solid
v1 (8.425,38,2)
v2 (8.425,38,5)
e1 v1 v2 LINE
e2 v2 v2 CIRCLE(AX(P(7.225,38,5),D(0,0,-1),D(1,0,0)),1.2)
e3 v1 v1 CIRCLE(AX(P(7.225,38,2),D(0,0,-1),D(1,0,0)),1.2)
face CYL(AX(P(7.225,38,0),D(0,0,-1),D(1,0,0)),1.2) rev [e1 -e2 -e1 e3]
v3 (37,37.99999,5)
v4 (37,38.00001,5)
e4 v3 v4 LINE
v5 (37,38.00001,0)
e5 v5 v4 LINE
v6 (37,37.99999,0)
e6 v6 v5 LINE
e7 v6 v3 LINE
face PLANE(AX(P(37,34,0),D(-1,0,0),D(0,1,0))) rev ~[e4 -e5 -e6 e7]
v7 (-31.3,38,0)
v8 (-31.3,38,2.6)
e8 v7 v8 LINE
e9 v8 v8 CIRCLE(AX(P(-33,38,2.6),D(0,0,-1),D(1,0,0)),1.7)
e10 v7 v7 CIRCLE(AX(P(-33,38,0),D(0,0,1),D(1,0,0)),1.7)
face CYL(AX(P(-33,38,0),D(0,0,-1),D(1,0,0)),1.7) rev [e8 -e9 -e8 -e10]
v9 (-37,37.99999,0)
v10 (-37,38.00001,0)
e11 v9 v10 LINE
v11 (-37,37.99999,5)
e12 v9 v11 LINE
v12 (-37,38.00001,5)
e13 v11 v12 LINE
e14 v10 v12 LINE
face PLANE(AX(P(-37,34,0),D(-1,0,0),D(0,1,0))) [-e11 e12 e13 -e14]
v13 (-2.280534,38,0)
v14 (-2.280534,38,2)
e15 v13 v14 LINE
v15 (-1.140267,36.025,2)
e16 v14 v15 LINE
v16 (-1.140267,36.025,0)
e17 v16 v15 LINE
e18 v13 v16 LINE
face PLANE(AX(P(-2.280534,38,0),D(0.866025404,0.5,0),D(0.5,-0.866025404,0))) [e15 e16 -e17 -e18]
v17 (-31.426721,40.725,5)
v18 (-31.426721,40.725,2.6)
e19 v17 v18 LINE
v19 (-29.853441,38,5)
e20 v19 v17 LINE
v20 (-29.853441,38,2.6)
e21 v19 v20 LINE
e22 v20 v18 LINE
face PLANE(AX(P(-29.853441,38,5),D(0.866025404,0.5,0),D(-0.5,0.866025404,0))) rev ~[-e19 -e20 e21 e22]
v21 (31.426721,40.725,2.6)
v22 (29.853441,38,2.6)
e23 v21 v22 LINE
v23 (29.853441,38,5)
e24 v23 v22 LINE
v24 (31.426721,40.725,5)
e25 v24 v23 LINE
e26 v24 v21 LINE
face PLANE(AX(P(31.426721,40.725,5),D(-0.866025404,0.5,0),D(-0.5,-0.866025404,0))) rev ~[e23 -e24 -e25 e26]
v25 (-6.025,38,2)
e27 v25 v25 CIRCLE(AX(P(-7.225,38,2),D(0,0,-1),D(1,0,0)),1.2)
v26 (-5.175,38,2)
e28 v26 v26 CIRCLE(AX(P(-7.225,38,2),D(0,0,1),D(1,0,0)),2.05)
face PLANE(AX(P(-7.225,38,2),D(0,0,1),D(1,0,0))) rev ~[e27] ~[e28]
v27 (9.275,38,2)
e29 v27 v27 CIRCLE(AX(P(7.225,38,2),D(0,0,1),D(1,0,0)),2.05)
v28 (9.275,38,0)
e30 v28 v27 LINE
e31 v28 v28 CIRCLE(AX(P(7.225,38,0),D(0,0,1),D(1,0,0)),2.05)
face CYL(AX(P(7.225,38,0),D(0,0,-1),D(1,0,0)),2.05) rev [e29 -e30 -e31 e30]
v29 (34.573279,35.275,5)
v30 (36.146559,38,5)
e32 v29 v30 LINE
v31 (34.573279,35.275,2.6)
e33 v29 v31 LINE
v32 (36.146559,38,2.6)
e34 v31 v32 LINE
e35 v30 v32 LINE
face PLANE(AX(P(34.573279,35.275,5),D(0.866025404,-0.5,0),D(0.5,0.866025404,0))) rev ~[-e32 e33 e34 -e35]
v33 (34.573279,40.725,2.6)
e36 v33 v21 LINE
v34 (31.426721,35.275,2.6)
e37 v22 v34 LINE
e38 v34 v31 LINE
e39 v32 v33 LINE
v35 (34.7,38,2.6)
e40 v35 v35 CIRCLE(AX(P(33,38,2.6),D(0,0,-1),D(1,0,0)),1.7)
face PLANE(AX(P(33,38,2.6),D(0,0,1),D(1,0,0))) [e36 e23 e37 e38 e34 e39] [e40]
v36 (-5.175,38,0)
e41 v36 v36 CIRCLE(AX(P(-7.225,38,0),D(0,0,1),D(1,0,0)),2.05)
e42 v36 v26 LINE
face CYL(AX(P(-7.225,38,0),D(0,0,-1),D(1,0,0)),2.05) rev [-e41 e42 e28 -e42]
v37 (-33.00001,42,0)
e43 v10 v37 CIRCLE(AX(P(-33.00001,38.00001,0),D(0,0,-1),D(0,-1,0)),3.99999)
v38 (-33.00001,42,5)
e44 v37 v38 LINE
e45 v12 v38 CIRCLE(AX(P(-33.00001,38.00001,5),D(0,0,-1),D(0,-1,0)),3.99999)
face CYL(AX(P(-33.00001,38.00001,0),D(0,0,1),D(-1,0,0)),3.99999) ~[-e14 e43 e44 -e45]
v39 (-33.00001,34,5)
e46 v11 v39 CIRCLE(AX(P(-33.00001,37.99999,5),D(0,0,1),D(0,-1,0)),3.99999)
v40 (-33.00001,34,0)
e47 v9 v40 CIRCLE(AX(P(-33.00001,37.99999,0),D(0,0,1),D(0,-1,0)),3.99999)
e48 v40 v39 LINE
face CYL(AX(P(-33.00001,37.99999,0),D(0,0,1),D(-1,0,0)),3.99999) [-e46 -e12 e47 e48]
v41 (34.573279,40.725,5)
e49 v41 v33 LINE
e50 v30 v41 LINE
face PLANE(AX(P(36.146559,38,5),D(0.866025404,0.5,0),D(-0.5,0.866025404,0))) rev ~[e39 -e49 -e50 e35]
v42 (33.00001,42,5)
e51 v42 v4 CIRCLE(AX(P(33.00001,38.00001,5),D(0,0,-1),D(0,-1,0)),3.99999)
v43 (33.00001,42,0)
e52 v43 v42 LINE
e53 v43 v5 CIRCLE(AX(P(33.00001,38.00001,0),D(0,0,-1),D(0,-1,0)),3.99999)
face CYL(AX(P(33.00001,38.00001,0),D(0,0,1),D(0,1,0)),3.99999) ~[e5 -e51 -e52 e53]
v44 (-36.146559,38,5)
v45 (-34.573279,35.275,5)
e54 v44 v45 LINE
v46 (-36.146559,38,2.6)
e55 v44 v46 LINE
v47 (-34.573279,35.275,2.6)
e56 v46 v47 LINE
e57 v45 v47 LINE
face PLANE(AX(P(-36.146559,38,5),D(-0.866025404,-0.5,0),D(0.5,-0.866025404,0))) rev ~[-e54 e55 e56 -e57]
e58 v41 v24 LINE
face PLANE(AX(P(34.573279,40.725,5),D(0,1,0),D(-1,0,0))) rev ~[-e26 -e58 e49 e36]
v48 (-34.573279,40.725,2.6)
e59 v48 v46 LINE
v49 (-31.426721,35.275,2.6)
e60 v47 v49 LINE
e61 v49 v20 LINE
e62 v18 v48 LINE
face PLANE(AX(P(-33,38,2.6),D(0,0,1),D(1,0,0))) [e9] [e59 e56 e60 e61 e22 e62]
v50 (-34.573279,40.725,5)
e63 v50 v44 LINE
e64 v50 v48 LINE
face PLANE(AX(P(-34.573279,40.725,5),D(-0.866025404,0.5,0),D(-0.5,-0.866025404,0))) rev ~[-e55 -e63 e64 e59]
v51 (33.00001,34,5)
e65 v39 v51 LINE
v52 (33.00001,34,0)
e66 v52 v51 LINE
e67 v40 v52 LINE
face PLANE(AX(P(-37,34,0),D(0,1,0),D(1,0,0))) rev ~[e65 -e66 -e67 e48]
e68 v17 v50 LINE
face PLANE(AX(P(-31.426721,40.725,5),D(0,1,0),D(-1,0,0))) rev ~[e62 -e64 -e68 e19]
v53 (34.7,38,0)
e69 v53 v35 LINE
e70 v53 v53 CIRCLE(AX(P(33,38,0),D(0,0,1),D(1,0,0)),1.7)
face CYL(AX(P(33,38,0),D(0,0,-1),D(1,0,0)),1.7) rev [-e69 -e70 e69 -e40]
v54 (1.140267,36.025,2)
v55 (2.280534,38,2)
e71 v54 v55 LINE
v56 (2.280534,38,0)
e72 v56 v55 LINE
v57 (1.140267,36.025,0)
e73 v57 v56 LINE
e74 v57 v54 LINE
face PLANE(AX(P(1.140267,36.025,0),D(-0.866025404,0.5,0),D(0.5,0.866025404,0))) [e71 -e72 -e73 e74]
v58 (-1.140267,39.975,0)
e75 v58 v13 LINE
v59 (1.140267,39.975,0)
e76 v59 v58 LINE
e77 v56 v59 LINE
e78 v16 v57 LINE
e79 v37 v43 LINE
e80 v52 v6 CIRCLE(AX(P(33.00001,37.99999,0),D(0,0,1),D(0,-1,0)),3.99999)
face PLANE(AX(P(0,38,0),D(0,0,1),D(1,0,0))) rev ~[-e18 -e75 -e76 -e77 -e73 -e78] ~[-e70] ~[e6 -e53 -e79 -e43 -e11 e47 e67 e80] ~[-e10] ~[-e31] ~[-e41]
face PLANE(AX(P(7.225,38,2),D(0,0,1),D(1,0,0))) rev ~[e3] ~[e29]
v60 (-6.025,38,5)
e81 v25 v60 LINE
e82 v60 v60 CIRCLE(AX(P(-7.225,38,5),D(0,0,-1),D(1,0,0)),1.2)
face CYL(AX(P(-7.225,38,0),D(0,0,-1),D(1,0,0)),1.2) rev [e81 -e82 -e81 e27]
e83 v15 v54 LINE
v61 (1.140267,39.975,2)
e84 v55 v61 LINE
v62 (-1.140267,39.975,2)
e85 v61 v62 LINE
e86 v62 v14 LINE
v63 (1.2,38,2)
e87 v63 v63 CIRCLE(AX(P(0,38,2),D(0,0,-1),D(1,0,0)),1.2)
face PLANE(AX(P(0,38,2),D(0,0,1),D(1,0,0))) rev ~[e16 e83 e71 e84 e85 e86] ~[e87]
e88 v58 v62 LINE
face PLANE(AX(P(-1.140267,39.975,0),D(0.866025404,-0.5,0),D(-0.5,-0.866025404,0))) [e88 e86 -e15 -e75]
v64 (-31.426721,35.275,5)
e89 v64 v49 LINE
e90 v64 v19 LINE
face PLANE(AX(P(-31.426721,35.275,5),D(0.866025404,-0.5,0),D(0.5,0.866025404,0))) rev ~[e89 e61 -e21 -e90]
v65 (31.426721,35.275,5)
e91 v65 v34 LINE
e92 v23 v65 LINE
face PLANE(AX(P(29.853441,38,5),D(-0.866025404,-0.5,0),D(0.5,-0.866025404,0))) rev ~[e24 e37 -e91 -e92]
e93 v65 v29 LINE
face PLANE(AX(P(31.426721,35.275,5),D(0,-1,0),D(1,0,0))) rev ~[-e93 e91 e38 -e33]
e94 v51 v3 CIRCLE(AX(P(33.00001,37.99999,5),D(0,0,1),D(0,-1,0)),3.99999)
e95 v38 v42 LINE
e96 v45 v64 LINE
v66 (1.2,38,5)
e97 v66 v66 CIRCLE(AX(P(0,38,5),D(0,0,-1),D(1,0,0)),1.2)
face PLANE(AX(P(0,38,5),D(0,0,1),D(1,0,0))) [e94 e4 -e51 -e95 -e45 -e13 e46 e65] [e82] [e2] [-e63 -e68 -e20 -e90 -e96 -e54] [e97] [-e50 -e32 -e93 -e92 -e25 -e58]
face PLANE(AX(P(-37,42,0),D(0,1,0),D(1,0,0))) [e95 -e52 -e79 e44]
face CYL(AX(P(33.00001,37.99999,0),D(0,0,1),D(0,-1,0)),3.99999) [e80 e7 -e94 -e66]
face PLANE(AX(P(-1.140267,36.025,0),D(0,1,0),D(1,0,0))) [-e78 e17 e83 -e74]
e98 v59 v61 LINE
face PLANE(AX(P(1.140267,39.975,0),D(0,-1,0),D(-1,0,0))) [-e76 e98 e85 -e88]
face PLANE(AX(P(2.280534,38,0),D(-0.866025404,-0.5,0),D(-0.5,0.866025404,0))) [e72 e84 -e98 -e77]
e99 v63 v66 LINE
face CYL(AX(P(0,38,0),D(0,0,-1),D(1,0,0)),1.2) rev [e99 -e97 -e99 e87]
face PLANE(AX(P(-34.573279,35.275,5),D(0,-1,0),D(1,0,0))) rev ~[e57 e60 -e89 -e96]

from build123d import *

# Parameters (mm, degrees)
F2_W      = 74
F2_H      = 8
F2_R      = 3
F5_DEPTH  = 5
F0_R      = 1.7
F6_DEPTH  = 12.5
F3_R      = 2.05
F7_DEPTH  = 2
F8_DEPTH  = 2
F10_DEPTH = 2.4
F11_R     = 3.99999
F4_R      = 1.2
F12_DEPTH = 5.001


# Not quite as in the source:
# - a fillet or chamfer is up to 0.001 mm smaller than in the source, because OpenCascade refuses the exact size


with BuildPart() as f5:
    # F2 (on face) → F5 (new body)
    with BuildSketch(Plane.XY):
        with Locations((0, 38)):
            Rectangle(F2_W, F2_H)
        with Locations((-33, 38)):
            Circle(F2_R, mode=Mode.SUBTRACT)
        Polygon((1.1402667816, 36.025), (0, 36.025), (-1.1402667816, 36.025), (-2.2805335633, 38), (-1.1402667816, 39.975), (0, 39.975), (1.1402667816, 39.975), (2.2805335633, 38), align=None, mode=Mode.SUBTRACT)
        with Locations((33, 38)):
            Circle(F2_R, mode=Mode.SUBTRACT)
        Polygon((-1.1402667816, 36.025), (0, 36.025), (1.1402667816, 36.025), (2.2805335633, 38), (1.1402667816, 39.975), (0, 39.975), (-1.1402667816, 39.975), (-2.2805335633, 38), align=None)
        with Locations((-33, 38)):
            Circle(F2_R)
        with Locations((33, 38)):
            Circle(F2_R)
    extrude(amount=F5_DEPTH)

    # F0 (on Top) → F6 (cut, symmetric)
    with BuildSketch(Plane.XY):
        with Locations((-33, 38)):
            Circle(F0_R)
        with Locations((33, 38)):
            Circle(F0_R)
        with Locations((-33, -38)):
            Circle(F0_R)
        with Locations((33, -38)):
            Circle(F0_R)
    extrude(amount=F6_DEPTH, both=True, mode=Mode.SUBTRACT)

    # F3 (on face) → F7 (cut)
    with BuildSketch(Plane.XY):
        with Locations((-7.225, 38)):
            Circle(F3_R)
        with Locations((7.225, 38)):
            Circle(F3_R)
    extrude(amount=F7_DEPTH, mode=Mode.SUBTRACT)

    # F2 (on face) → F8 (cut)
    with BuildSketch(Plane.XY):
        Polygon((-1.1402667816, 36.025), (0, 36.025), (1.1402667816, 36.025), (2.2805335633, 38), (1.1402667816, 39.975), (0, 39.975), (-1.1402667816, 39.975), (-2.2805335633, 38), align=None)
    extrude(amount=F8_DEPTH, mode=Mode.SUBTRACT)

    # F9 (on face) → F10 (cut)
    with BuildSketch(Plane.XY.offset(5)):
        Polygon((-34.5732794835, 35.275), (-33, 35.275), (-31.4267205165, 35.275), (-29.8534410329, 38), (-31.4267205165, 40.725), (-33, 40.725), (-34.5732794835, 40.725), (-36.1465589671, 38), align=None)
        Polygon((29.8534410329, 38), (31.4267205165, 35.275), (33, 35.275), (34.5732794835, 35.275), (36.1465589671, 38), (34.5732794835, 40.725), (33, 40.725), (31.4267205165, 40.725), align=None)
    extrude(amount=-F10_DEPTH, mode=Mode.SUBTRACT)

    # F11 (radius 4 in the source; OpenCascade refuses exactly that, so slightly less here)
    f11_edges = [f5.edges().sort_by_distance(p)[0] for p in [
        (-37, 42, 2.5),
        (-37, 34, 2.5),
        (37, 42, 2.5),
        (37, 34, 2.5),
    ]]
    fillet(f11_edges, radius=F11_R)

    # F4 (on face) → F12 (cut, through all)
    with BuildSketch(Plane.XY):
        with Locations((-7.225, 38)):
            Circle(F4_R)
        with Locations((0, 38)):
            Circle(F4_R)
        with Locations((7.225, 38)):
            Circle(F4_R)
    extrude(amount=F12_DEPTH, mode=Mode.SUBTRACT)


solid = f5.part
